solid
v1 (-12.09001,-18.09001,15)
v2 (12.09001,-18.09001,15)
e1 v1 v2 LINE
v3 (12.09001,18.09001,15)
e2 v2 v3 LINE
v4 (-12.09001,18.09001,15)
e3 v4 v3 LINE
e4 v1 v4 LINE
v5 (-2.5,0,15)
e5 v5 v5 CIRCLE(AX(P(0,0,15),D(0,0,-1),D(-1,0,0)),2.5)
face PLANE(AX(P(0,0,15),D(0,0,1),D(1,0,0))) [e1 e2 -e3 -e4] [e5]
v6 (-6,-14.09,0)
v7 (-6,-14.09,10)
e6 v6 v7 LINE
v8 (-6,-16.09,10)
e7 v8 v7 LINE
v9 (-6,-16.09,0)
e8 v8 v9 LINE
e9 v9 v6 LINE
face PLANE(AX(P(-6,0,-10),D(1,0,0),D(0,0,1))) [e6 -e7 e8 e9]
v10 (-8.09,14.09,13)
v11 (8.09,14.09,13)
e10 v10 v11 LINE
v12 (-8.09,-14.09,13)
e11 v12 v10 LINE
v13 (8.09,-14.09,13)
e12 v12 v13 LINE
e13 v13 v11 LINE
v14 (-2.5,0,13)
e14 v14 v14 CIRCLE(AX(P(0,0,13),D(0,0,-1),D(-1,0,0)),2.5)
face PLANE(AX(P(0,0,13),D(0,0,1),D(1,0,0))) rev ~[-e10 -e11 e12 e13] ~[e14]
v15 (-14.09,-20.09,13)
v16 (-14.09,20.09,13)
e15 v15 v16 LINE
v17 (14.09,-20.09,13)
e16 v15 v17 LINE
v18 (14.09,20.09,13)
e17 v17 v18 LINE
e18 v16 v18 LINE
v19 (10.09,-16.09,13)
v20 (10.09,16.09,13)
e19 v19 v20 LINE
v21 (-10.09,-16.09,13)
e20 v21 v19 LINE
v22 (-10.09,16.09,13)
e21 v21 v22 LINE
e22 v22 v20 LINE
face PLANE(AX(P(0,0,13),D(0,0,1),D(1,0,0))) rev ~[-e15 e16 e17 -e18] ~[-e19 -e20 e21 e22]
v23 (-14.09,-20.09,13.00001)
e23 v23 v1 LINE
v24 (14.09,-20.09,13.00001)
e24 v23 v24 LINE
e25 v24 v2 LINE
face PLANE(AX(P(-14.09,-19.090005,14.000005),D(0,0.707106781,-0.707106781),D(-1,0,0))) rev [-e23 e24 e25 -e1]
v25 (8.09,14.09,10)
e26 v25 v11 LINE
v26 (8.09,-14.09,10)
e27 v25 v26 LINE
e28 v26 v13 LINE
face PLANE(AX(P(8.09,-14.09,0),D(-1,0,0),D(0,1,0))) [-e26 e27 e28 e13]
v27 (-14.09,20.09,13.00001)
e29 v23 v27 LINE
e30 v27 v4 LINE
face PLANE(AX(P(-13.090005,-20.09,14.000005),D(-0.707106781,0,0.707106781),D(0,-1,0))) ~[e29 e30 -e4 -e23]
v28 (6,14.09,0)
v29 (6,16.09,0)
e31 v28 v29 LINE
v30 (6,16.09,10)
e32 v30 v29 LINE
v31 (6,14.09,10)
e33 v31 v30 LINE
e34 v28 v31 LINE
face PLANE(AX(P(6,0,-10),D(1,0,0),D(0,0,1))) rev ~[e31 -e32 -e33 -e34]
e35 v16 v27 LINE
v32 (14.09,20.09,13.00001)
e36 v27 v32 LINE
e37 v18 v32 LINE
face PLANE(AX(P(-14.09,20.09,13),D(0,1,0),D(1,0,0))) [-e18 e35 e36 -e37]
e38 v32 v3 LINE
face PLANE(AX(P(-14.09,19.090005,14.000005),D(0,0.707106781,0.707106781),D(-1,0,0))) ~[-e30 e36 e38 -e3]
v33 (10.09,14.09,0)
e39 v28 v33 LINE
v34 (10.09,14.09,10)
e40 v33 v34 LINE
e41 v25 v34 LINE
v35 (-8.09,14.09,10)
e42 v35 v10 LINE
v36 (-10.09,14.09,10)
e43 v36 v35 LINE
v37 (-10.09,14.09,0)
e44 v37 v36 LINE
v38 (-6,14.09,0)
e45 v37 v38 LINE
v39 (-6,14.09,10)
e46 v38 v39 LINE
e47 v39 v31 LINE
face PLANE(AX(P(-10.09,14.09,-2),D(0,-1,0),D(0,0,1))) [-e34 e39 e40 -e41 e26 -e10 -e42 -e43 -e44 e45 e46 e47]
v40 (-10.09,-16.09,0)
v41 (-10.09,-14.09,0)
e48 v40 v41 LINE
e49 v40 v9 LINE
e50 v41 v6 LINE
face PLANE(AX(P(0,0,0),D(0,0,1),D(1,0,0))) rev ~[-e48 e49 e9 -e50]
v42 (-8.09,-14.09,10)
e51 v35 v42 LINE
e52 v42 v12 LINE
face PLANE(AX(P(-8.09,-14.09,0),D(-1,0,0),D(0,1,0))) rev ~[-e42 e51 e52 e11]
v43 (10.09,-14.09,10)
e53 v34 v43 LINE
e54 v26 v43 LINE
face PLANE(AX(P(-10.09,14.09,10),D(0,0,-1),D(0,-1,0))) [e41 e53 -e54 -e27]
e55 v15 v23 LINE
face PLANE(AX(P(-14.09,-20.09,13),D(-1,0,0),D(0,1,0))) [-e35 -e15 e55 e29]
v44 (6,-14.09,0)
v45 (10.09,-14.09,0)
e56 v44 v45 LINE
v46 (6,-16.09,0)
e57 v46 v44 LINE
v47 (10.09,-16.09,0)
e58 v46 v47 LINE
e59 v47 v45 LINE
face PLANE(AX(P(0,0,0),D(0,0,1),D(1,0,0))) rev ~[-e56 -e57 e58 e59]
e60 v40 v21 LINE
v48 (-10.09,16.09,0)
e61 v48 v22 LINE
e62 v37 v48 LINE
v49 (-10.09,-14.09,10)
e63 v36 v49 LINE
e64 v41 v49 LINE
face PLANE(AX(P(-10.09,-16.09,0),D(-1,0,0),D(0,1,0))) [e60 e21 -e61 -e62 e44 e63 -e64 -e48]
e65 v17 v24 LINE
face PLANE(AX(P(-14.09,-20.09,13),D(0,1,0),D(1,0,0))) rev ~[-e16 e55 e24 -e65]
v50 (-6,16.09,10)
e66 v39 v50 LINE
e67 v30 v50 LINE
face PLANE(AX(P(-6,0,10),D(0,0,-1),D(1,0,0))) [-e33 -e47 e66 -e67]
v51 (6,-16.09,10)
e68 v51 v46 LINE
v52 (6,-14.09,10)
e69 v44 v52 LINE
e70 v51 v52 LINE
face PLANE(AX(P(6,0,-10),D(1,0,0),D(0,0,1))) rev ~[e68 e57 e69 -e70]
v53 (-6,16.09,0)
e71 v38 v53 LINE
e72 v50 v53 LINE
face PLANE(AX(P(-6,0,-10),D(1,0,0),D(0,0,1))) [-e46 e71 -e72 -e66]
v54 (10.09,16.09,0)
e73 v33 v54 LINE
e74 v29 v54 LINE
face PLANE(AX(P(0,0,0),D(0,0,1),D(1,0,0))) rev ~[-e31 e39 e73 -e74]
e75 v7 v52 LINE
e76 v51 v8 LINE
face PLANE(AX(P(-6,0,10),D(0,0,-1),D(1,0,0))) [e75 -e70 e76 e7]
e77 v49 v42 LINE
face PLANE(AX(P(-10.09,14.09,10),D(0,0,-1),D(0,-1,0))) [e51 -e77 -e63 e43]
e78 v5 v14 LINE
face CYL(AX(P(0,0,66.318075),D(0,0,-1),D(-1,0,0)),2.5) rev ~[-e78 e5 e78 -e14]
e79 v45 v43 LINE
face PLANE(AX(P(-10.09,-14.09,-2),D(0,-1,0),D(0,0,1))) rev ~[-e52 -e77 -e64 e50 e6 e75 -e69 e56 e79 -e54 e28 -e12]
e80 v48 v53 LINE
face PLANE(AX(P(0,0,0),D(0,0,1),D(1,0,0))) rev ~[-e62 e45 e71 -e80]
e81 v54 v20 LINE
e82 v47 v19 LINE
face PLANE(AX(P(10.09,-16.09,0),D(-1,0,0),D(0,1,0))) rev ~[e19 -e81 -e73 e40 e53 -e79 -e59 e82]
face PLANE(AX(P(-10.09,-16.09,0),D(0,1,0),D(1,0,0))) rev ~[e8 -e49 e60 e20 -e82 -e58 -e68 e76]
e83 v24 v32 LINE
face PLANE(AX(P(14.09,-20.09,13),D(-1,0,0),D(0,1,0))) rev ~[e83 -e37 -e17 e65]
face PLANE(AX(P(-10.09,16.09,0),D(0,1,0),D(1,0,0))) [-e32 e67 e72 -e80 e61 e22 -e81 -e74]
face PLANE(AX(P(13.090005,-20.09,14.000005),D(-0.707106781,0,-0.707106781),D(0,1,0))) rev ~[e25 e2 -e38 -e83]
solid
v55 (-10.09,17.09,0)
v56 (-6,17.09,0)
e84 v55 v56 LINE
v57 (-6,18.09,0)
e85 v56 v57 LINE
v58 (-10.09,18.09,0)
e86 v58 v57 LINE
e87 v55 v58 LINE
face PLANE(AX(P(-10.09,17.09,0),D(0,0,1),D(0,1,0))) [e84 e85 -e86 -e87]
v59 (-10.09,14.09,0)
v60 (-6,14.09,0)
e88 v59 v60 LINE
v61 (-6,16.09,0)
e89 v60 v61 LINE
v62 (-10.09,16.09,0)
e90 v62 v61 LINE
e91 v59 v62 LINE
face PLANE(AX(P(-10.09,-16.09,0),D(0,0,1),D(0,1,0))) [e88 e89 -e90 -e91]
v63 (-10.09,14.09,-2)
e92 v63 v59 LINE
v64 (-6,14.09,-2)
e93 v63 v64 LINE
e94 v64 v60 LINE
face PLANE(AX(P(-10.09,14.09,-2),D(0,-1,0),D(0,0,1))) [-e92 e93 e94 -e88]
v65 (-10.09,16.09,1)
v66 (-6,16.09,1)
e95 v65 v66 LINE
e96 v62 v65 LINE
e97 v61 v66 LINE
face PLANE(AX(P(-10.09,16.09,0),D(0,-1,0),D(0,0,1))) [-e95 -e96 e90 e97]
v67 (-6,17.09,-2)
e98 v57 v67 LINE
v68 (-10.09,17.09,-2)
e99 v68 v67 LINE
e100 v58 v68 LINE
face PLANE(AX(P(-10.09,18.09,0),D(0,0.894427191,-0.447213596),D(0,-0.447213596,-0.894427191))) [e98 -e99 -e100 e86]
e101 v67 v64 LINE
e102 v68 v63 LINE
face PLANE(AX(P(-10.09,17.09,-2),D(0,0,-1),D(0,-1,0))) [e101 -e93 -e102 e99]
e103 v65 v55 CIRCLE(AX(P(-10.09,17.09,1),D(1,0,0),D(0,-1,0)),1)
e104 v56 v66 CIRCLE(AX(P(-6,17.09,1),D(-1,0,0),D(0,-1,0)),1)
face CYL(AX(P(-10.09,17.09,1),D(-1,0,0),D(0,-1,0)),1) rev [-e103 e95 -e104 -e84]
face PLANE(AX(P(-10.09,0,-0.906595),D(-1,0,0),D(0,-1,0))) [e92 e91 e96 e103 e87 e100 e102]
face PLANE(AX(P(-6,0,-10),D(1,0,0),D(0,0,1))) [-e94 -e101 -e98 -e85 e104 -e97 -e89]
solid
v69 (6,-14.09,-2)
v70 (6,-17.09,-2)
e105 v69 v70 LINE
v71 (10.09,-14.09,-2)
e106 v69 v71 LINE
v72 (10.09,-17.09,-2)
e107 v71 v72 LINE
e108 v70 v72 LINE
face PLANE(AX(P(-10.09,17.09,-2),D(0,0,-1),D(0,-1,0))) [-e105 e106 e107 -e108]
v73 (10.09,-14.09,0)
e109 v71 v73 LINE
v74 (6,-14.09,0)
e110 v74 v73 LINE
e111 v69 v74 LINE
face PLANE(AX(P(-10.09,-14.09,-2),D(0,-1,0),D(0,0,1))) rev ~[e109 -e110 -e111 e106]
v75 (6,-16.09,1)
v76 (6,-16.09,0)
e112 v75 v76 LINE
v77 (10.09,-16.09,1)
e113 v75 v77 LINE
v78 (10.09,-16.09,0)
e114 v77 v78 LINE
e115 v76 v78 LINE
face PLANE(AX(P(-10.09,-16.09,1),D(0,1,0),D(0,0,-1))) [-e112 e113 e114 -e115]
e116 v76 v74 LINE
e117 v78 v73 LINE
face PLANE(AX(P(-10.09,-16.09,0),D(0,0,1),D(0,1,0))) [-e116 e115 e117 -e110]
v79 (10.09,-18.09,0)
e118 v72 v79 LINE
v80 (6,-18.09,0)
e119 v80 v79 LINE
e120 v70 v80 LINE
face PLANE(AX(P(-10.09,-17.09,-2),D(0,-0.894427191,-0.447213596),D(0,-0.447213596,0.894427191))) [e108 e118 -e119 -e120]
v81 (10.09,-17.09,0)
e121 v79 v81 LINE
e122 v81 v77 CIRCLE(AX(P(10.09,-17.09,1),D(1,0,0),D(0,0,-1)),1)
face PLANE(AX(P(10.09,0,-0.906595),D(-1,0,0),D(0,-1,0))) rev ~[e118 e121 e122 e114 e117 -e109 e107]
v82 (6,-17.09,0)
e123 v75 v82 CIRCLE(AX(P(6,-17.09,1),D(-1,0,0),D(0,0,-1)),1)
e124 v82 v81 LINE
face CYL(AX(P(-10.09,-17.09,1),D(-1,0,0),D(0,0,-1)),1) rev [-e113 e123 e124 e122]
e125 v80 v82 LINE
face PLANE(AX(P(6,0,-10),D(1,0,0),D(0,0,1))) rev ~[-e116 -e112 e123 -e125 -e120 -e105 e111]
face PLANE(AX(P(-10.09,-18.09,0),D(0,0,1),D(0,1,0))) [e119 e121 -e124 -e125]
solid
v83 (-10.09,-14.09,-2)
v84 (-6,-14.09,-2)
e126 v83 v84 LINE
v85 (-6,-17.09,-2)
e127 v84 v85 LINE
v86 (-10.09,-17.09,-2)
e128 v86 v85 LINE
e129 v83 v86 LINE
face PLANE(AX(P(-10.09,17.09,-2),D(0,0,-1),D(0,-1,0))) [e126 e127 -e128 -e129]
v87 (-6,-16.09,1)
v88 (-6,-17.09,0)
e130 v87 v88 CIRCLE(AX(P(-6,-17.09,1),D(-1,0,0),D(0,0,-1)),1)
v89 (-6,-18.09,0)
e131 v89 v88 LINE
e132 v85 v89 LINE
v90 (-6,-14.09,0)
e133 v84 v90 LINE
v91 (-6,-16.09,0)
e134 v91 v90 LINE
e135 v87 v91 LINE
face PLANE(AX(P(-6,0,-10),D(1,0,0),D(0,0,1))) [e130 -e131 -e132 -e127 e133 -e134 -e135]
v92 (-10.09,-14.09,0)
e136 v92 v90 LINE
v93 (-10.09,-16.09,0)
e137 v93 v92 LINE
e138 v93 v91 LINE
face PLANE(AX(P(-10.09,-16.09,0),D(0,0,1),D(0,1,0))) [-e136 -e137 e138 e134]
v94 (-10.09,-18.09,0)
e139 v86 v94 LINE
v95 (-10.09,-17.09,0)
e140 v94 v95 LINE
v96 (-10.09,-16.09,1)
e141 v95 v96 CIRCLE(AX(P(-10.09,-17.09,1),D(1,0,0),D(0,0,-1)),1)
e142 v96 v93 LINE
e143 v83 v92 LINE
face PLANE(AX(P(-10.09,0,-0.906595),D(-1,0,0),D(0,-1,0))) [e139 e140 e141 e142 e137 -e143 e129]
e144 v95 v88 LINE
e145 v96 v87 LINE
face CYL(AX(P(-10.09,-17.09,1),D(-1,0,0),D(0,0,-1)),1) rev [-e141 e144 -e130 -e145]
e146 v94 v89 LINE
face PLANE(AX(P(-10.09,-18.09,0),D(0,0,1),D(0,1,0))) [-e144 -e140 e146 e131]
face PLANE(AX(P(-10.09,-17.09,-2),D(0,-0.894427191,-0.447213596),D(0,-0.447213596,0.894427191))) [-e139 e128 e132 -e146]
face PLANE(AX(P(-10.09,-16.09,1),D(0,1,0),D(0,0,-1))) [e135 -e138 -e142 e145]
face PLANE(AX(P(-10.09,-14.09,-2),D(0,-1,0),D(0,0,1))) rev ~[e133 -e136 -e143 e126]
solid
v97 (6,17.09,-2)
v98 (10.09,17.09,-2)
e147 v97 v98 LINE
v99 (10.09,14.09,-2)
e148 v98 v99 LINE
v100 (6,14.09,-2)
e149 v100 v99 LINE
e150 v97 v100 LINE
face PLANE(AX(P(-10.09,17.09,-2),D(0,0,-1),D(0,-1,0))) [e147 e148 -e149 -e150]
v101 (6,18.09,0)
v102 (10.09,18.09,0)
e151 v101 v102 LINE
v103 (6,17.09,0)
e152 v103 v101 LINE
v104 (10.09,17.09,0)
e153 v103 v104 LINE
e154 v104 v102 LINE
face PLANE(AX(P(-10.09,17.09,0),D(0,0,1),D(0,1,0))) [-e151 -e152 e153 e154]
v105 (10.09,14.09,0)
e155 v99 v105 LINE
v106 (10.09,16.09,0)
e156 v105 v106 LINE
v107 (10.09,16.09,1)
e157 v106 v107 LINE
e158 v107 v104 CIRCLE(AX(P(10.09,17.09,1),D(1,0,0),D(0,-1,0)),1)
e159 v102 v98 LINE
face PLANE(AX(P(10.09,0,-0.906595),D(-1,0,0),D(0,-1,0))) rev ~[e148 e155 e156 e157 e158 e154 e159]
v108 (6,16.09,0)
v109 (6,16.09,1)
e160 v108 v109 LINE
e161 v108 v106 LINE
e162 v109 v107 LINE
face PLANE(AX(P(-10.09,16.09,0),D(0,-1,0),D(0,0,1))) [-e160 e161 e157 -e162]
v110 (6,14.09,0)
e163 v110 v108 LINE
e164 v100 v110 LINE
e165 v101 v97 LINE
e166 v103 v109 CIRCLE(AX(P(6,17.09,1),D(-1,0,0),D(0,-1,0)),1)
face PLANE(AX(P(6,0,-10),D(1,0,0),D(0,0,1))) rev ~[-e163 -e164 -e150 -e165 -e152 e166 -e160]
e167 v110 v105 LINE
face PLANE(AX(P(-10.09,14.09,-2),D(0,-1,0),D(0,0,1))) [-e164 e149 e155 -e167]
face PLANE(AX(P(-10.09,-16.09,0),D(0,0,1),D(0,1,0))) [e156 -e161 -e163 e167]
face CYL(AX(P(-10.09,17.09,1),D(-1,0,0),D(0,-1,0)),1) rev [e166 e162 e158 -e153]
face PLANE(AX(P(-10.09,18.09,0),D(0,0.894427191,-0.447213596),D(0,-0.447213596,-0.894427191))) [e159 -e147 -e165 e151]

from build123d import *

# Parameters (mm, degrees)
F0_W      = 20.18
F0_H      = 32.18
F0_W_2    = 16.18
F0_H_2    = 28.18
F1_DEPTH  = 13
F2_W      = 28.18
F2_H      = 40.18
F2_W_2    = 20.18
F2_H_2    = 32.18
F2_W_3    = 16.18
F2_H_3    = 28.18
F3_DEPTH  = 2
F4_SIZE   = 1.99999
F6_D      = 5
F8_DEPTH  = 20.18
F9_W      = 28.18
F9_H      = 12
F10_DEPTH = 25
F11_W     = 12
F11_H     = 20
F12_DEPTH = 25


# Not quite as in the source:
# - a fillet or chamfer is up to 0.001 mm smaller than in the source, because OpenCascade refuses the exact size


with BuildPart() as f1:
    # F0 (on Top) → F1 (new body)
    with BuildSketch(Plane.XY):
        Rectangle(F0_W, F0_H)
        Rectangle(F0_W_2, F0_H_2, mode=Mode.SUBTRACT)
    extrude(amount=F1_DEPTH)

    # F2 (on face) → F3 (join)
    with BuildSketch(Plane.XY.offset(13)):
        Rectangle(F2_W, F2_H)
        Rectangle(F2_W_2, F2_H_2, mode=Mode.SUBTRACT)
        Rectangle(F2_W_2, F2_H_2)
        Rectangle(F2_W_3, F2_H_3, mode=Mode.SUBTRACT)
        Rectangle(F2_W_3, F2_H_3)
    extrude(amount=F3_DEPTH)

    # F4 (size 2 in the source; OpenCascade refuses exactly that, so slightly less here)
    f4_edges = [f1.edges().sort_by_distance(p)[0] for p in [
        (0, -20.09, 15),
        (-14.09, 0, 15),
        (0, 20.09, 15),
        (14.09, 0, 15),
    ]]
    chamfer(f4_edges, length=F4_SIZE)

    # F6 (through all)
    with Locations(Plane.XY.offset(15)):
        with Locations((0, 0)):
            Hole(F6_D / 2)


with BuildPart() as f8:
    # F7 (on face) → F8 (new body)
    with BuildSketch(Plane(origin=(-10.09, 0, 0), x_dir=(0, -1, 0), z_dir=(-1, 0, 0))):
        with BuildLine():
            Line((17.09, -2), (18.09, 0))
            Line((18.09, 0), (17.09, 0))
            ThreePointArc((17.09, 0), (16.3828932188, 0.2928932188), (16.09, 1))
            Line((16.09, 1), (16.09, 0))
            Line((16.09, 0), (-16.09, 0))
            Line((-16.09, 0), (-16.09, 1))
            ThreePointArc((-16.09, 1), (-16.3828932188, 0.2928932188), (-17.09, 0))
            Line((-17.09, 0), (-18.09, 0))
            Line((-18.09, 0), (-17.09, -2))
            Line((-17.09, -2), (17.09, -2))
        make_face()
    extrude(amount=-F8_DEPTH)


with BuildPart() as f10_tool:
    # F9 (on face) → F10 (new body)
    with BuildSketch(Plane(origin=(-10.09, 0, 0), x_dir=(0, -1, 0), z_dir=(-1, 0, 0))):
        with Locations((0, 4)):
            Rectangle(F9_W, F9_H)
    extrude(amount=-F10_DEPTH)


with BuildPart() as f1_1:
    add(f1.part)

    # F10: cut by f10_tool
    add(f10_tool.part, mode=Mode.SUBTRACT)


with BuildPart() as f8_1:
    add(f8.part)

    # F10: cut by f10_tool
    add(f10_tool.part, mode=Mode.SUBTRACT)


with BuildPart() as f12_tool:
    # F11 (on Front) → F12 (new body, symmetric)
    with BuildSketch(Plane.XZ):
        Rectangle(F11_W, F11_H)
    extrude(amount=F12_DEPTH, both=True)


with BuildPart() as f1_2:
    add(f1_1.part)

    # F12: cut by f12_tool
    add(f12_tool.part, mode=Mode.SUBTRACT)


with BuildPart() as f8_2:
    add(f8_1.part)

    # F12: cut by f12_tool
    add(f12_tool.part, mode=Mode.SUBTRACT)


solid = Compound([f1_2.part, f8_2.part])
